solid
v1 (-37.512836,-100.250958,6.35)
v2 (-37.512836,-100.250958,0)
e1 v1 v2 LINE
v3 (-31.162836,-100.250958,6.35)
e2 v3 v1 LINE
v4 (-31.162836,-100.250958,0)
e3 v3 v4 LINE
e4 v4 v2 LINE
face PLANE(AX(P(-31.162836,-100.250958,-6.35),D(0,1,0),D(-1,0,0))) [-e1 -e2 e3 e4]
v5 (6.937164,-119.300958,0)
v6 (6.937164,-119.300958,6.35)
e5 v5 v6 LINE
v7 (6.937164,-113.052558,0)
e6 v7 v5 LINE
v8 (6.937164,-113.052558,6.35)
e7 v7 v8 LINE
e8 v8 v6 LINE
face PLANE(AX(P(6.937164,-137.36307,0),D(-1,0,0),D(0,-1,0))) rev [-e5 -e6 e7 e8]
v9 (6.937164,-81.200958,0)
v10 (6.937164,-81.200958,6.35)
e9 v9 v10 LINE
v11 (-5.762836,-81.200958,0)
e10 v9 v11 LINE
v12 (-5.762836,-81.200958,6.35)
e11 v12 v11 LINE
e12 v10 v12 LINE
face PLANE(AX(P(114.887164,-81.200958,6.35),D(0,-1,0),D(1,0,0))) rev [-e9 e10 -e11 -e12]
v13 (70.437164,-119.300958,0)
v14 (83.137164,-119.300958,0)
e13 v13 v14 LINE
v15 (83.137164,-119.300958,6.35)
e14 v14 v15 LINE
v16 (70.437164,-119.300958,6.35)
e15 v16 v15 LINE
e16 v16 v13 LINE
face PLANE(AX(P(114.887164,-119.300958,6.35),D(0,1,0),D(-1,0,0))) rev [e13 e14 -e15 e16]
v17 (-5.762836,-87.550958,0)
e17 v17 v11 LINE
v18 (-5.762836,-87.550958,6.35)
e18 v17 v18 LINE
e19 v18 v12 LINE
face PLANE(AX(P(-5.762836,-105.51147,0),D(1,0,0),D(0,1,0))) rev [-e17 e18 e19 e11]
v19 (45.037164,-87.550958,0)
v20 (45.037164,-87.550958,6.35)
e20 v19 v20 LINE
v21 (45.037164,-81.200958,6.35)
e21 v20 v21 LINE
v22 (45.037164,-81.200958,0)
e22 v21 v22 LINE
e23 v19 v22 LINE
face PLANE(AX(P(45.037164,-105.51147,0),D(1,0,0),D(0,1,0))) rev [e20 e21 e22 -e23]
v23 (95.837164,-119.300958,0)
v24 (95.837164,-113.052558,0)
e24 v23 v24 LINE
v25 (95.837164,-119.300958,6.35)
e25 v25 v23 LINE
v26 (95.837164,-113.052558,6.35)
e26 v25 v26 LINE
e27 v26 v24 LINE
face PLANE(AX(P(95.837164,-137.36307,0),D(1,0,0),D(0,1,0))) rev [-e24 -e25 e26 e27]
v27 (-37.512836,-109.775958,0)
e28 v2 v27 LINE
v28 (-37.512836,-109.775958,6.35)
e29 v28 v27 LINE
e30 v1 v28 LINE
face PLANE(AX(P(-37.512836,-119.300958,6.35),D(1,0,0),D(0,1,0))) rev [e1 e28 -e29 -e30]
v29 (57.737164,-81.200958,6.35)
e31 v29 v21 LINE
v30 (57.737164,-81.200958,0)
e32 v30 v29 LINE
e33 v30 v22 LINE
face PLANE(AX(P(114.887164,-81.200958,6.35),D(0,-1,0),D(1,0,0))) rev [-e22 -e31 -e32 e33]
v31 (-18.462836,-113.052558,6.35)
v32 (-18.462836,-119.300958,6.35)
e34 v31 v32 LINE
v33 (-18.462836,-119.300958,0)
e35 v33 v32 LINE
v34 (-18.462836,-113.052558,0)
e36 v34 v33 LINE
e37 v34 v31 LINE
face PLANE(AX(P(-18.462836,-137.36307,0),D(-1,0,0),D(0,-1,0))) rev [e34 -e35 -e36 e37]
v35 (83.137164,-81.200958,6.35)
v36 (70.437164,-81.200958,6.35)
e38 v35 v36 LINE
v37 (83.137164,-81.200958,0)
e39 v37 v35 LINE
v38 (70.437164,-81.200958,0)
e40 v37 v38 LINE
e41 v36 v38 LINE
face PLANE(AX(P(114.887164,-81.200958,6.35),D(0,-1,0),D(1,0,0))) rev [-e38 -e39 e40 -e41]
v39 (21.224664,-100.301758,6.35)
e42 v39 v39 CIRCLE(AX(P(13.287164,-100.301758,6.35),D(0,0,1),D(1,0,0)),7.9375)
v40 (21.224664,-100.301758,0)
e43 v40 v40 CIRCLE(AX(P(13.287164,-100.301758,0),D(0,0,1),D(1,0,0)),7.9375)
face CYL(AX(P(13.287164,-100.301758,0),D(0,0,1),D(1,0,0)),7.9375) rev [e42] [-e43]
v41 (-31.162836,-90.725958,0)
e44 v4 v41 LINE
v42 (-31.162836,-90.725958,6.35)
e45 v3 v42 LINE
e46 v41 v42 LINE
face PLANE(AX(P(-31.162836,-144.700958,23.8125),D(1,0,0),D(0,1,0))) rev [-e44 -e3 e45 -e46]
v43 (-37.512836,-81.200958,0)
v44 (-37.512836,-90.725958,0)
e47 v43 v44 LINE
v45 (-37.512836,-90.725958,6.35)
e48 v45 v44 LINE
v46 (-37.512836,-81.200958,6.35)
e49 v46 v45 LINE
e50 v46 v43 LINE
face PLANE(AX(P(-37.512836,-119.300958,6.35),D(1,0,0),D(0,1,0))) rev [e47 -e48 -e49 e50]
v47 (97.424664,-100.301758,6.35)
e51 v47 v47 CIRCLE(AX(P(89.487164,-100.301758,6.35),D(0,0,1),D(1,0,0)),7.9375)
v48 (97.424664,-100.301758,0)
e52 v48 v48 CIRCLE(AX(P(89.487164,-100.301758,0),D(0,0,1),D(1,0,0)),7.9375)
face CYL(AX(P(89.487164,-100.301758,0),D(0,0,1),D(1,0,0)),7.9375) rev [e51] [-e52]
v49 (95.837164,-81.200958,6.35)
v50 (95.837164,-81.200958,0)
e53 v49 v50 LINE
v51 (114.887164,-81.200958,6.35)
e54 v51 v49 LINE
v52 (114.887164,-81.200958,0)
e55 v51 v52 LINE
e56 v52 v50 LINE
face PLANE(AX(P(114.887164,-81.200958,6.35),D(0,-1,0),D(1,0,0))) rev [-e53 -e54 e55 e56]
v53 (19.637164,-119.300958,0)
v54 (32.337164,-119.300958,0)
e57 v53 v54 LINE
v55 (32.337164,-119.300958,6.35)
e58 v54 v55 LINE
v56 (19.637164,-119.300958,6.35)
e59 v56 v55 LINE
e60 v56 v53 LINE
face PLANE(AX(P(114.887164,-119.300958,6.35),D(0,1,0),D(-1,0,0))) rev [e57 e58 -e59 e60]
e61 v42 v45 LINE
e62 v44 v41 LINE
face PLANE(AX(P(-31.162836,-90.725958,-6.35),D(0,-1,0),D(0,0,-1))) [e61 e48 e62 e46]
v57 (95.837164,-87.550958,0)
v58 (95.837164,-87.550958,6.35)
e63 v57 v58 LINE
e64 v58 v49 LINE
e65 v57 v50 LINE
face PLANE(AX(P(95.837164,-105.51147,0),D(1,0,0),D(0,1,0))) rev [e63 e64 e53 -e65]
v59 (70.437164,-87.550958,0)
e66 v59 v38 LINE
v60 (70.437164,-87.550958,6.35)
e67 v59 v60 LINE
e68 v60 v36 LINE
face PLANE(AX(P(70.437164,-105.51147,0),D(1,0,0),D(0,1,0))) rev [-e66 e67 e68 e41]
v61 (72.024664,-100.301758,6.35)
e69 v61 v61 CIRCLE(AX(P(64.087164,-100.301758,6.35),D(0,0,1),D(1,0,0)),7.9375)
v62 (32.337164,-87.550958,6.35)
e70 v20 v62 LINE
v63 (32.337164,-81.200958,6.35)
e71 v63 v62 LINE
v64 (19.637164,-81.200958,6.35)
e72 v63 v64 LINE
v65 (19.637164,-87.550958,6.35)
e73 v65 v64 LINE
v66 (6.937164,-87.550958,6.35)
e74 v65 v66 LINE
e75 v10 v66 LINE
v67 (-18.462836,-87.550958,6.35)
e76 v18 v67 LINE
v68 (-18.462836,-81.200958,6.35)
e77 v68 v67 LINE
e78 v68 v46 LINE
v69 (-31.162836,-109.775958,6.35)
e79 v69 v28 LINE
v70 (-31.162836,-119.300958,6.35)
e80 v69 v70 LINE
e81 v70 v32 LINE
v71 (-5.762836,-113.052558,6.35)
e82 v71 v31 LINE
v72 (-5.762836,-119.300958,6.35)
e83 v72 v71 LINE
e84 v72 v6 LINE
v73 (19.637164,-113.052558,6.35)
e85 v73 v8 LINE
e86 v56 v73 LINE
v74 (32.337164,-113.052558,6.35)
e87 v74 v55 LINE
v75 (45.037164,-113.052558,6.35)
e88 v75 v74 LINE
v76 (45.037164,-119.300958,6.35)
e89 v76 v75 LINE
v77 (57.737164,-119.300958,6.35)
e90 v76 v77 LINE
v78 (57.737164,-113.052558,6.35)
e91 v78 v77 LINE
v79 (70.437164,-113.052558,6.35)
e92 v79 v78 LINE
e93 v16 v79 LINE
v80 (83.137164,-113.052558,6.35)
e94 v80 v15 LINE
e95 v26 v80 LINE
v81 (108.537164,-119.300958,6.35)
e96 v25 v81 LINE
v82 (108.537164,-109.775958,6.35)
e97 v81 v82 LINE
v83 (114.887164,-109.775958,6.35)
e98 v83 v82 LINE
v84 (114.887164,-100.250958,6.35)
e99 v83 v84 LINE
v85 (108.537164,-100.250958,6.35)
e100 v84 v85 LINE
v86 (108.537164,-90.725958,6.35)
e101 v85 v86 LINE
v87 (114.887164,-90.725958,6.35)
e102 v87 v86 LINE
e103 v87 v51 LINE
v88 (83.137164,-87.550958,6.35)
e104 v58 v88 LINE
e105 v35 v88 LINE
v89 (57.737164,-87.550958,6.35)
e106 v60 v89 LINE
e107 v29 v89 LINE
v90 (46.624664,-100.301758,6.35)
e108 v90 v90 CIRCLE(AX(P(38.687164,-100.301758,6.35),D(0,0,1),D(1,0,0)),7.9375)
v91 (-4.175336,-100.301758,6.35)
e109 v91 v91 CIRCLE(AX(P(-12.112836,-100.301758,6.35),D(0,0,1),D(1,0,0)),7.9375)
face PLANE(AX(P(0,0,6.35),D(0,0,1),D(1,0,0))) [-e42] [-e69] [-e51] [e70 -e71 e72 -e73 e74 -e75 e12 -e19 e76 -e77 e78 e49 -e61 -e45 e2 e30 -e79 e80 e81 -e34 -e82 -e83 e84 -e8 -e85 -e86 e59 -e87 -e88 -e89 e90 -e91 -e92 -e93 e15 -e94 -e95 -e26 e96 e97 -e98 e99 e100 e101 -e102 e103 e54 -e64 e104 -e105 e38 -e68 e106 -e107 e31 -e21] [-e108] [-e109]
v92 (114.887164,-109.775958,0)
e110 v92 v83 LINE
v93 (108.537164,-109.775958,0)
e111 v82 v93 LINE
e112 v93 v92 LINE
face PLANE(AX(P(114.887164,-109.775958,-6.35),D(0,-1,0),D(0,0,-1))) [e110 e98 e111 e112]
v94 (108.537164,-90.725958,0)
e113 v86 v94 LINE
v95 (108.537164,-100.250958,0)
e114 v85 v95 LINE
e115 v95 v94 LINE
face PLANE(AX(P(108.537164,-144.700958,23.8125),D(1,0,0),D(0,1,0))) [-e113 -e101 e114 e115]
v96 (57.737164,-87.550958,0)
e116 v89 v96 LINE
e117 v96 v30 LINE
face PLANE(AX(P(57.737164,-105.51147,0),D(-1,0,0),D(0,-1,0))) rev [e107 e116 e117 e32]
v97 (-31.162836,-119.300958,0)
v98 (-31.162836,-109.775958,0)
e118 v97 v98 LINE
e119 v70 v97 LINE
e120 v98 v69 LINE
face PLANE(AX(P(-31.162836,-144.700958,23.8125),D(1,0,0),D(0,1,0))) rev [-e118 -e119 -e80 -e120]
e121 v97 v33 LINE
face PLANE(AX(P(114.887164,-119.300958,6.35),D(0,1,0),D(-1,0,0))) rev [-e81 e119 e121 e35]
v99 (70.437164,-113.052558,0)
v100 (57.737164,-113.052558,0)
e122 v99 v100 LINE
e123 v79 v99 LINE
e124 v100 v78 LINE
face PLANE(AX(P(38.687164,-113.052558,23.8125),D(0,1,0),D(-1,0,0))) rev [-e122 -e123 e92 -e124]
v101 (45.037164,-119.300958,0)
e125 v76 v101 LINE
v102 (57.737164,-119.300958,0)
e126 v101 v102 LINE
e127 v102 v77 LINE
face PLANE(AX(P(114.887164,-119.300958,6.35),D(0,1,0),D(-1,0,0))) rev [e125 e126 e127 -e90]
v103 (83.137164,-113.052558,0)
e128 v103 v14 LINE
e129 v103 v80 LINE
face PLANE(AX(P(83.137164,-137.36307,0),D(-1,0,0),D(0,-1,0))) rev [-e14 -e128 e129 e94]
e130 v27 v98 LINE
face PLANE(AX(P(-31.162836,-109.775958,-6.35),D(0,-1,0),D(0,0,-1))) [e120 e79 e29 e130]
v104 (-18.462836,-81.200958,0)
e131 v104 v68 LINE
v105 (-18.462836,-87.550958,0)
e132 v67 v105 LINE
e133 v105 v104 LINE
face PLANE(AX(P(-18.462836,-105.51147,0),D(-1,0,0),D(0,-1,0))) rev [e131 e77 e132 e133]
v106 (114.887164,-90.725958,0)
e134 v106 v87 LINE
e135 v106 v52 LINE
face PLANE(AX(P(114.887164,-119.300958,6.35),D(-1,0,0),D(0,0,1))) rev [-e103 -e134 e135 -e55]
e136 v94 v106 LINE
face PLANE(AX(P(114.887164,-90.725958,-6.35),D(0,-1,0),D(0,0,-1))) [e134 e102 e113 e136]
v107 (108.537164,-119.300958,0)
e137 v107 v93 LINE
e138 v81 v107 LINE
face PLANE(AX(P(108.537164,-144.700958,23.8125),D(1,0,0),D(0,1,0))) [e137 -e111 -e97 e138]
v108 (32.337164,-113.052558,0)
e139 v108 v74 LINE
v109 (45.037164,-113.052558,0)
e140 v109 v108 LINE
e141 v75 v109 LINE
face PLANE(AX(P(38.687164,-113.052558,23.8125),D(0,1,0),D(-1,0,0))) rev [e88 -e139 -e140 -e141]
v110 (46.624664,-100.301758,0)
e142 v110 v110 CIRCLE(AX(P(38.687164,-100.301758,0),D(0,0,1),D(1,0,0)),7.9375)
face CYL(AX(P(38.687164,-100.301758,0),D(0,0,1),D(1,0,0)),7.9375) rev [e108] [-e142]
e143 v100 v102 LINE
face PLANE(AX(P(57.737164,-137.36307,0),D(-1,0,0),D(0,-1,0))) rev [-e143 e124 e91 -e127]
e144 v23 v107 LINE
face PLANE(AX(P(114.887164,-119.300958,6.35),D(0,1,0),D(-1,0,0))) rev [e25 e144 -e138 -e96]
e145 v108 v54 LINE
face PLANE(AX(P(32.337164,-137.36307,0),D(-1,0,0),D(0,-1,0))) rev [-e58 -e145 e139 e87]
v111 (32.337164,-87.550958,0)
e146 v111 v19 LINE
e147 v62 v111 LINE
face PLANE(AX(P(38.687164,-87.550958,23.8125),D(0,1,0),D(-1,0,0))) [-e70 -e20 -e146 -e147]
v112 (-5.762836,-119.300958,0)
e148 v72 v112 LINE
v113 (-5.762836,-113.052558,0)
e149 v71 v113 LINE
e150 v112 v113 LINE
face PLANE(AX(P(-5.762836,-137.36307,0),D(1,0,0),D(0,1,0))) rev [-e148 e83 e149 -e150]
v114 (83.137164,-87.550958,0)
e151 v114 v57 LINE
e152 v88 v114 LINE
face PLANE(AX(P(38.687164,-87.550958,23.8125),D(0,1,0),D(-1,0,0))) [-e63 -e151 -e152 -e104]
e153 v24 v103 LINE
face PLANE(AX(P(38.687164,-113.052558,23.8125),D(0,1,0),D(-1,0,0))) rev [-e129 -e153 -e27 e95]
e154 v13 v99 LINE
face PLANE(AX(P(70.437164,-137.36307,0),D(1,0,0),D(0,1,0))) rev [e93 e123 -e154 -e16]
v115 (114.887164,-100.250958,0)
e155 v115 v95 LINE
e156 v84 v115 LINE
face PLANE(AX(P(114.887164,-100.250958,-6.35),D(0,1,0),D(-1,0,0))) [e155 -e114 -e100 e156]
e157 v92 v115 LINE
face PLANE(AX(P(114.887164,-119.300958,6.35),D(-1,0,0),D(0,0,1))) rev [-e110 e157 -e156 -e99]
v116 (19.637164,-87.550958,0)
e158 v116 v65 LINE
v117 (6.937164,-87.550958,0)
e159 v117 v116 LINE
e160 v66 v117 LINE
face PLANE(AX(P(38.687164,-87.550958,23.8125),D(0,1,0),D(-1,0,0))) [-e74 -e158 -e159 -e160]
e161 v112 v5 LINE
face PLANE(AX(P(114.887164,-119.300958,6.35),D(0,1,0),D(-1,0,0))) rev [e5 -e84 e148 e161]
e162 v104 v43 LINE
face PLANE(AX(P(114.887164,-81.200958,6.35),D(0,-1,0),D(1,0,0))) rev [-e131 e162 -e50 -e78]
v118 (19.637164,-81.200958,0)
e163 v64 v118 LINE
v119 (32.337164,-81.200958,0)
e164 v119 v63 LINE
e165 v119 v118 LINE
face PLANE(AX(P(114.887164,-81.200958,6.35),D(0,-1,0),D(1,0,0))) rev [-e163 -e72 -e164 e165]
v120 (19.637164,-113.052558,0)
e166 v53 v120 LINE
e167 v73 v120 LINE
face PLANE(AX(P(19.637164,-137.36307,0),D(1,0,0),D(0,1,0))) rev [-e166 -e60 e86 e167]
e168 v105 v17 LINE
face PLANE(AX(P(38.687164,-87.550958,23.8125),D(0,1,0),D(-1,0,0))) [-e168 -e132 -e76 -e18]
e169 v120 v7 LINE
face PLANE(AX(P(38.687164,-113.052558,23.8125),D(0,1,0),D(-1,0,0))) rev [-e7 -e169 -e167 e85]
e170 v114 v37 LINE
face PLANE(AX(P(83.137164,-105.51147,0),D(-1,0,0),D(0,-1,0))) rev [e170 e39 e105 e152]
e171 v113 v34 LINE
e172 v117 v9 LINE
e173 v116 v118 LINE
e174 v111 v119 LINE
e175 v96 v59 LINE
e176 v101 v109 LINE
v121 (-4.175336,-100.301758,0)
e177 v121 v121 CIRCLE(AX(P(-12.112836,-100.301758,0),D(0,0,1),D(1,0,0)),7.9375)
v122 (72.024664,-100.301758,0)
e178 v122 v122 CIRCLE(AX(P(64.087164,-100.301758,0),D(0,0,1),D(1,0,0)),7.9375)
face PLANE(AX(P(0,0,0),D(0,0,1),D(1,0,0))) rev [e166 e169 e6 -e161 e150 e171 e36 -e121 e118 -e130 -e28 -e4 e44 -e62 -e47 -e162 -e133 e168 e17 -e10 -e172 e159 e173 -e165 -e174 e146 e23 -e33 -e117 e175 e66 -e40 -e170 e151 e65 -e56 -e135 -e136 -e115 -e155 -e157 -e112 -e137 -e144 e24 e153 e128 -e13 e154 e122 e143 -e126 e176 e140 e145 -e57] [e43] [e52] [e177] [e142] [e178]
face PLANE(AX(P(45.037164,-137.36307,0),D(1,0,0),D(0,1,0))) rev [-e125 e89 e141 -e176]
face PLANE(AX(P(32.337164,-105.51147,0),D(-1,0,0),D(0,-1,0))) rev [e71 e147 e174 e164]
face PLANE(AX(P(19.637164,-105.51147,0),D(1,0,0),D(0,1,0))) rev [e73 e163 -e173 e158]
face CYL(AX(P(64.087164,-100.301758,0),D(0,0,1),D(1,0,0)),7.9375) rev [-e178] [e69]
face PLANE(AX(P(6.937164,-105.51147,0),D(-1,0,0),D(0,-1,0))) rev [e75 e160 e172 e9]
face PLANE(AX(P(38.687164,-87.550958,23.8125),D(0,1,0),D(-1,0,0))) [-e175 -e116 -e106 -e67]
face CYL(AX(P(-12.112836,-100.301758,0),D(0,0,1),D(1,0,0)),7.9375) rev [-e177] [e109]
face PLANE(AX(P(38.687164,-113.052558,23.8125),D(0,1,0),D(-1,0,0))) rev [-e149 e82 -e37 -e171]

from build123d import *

# Parameters (mm, degrees)
SKETCH1_W             = 152.4
SKETCH1_H             = 38.1
BOSS_EXTRUDE1_DEPTH   = 6.35
CAVITY1_START         = -18.462835622
CAVITY1_OUTLINE_W     = 6.35
CAVITY1_OUTLINE_H     = 6.35
CAVITY1_OUTLINE_W_2   = 6.2484
CAVITY1_DEPTH         = 12.7
CAVITY1_START_2       = 6.937164378
CAVITY1_2_OUTLINE_W   = 6.35
CAVITY1_2_OUTLINE_H   = 6.35
CAVITY1_2_OUTLINE_W_2 = 6.2484
CAVITY1_2_DEPTH       = 12.7
CAVITY1_START_3       = 32.337164378
CAVITY1_3_OUTLINE_W   = 6.35
CAVITY1_3_OUTLINE_H   = 6.35
CAVITY1_3_OUTLINE_W_2 = 6.2484
CAVITY1_3_DEPTH       = 12.7
CAVITY1_START_4       = 57.737164378
CAVITY1_4_OUTLINE_W   = 6.35
CAVITY1_4_OUTLINE_H   = 6.35
CAVITY1_4_OUTLINE_W_2 = 6.2484
CAVITY1_4_DEPTH       = 12.7
CAVITY1_START_5       = 83.137164378
CAVITY1_5_OUTLINE_W   = 6.35
CAVITY1_5_OUTLINE_H   = 6.35
CAVITY1_5_OUTLINE_W_2 = 6.2484
CAVITY1_5_DEPTH       = 12.7
CAVITY1_START_6       = -37.512835622
CAVITY1_6_OUTLINE_W   = 9.525
CAVITY1_6_OUTLINE_H   = 6.35
CAVITY1_6_DEPTH       = 6.35
CAVITY1_START_7       = 108.537164378
CAVITY1_7_OUTLINE_W   = 9.525
CAVITY1_7_OUTLINE_H   = 6.35
CAVITY1_7_DEPTH       = 6.35
SKETCH2_R             = 7.9375
CUT_EXTRUDE1_DEPTH    = 166.74710148
LPATTERN1_COUNT       = 5
LPATTERN1_PITCH       = 25.4


# Read off the part's stored shape, not the designer's step: Cavity1
with BuildPart() as part:
    # Sketch1 → Boss-Extrude1 (new body)
    with BuildSketch(Plane.XY):
        with Locations((38.687164378, -100.250958128)):
            Rectangle(SKETCH1_W, SKETCH1_H)
    extrude(amount=BOSS_EXTRUDE1_DEPTH)

    # Cavity1 outline → Cavity1 (cut)
    with BuildSketch(Plane.YZ.offset(CAVITY1_START)):
        with Locations((-84.375958128, 3.175)):
            Rectangle(CAVITY1_OUTLINE_W, CAVITY1_OUTLINE_H)
        with Locations((-116.176758128, 3.175)):
            Rectangle(CAVITY1_OUTLINE_W_2, CAVITY1_OUTLINE_H)
    extrude(amount=CAVITY1_DEPTH, mode=Mode.SUBTRACT)

    # Cavity1 2 outline → Cavity1 2 (cut)
    with BuildSketch(Plane.YZ.offset(CAVITY1_START_2)):
        with Locations((-84.375958128, 3.175)):
            Rectangle(CAVITY1_2_OUTLINE_W, CAVITY1_2_OUTLINE_H)
        with Locations((-116.176758128, 3.175)):
            Rectangle(CAVITY1_2_OUTLINE_W_2, CAVITY1_2_OUTLINE_H)
    extrude(amount=CAVITY1_2_DEPTH, mode=Mode.SUBTRACT)

    # Cavity1 3 outline → Cavity1 3 (cut)
    with BuildSketch(Plane.YZ.offset(CAVITY1_START_3)):
        with Locations((-84.375958128, 3.175)):
            Rectangle(CAVITY1_3_OUTLINE_W, CAVITY1_3_OUTLINE_H)
        with Locations((-116.176758128, 3.175)):
            Rectangle(CAVITY1_3_OUTLINE_W_2, CAVITY1_3_OUTLINE_H)
    extrude(amount=CAVITY1_3_DEPTH, mode=Mode.SUBTRACT)

    # Cavity1 4 outline → Cavity1 4 (cut)
    with BuildSketch(Plane.YZ.offset(CAVITY1_START_4)):
        with Locations((-84.375958128, 3.175)):
            Rectangle(CAVITY1_4_OUTLINE_W, CAVITY1_4_OUTLINE_H)
        with Locations((-116.176758128, 3.175)):
            Rectangle(CAVITY1_4_OUTLINE_W_2, CAVITY1_4_OUTLINE_H)
    extrude(amount=CAVITY1_4_DEPTH, mode=Mode.SUBTRACT)

    # Cavity1 5 outline → Cavity1 5 (cut)
    with BuildSketch(Plane.YZ.offset(CAVITY1_START_5)):
        with Locations((-84.375958128, 3.175)):
            Rectangle(CAVITY1_5_OUTLINE_W, CAVITY1_5_OUTLINE_H)
        with Locations((-116.176758128, 3.175)):
            Rectangle(CAVITY1_5_OUTLINE_W_2, CAVITY1_5_OUTLINE_H)
    extrude(amount=CAVITY1_5_DEPTH, mode=Mode.SUBTRACT)

    # Cavity1 6 outline → Cavity1 6 (cut)
    with BuildSketch(Plane.YZ.offset(CAVITY1_START_6)):
        with Locations((-95.488458128, 3.175)):
            Rectangle(CAVITY1_6_OUTLINE_W, CAVITY1_6_OUTLINE_H)
        with Locations((-114.538458128, 3.175)):
            Rectangle(CAVITY1_6_OUTLINE_W, CAVITY1_6_OUTLINE_H)
    extrude(amount=CAVITY1_6_DEPTH, mode=Mode.SUBTRACT)

    # Cavity1 7 outline → Cavity1 7 (cut)
    with BuildSketch(Plane.YZ.offset(CAVITY1_START_7)):
        with Locations((-95.488458128, 3.175)):
            Rectangle(CAVITY1_7_OUTLINE_W, CAVITY1_7_OUTLINE_H)
        with Locations((-114.538458128, 3.175)):
            Rectangle(CAVITY1_7_OUTLINE_W, CAVITY1_7_OUTLINE_H)
    extrude(amount=CAVITY1_7_DEPTH, mode=Mode.SUBTRACT)

    # Sketch2 → Cut-Extrude1 (cut, through all)
    with BuildSketch(Plane.XY.offset(6.35)):
        with Locations((-12.112835622, -100.301758128)):
            Circle(SKETCH2_R)
    cut_extrude1 = extrude(amount=-CUT_EXTRUDE1_DEPTH, mode=Mode.SUBTRACT)

    # LPattern1: Cut-Extrude1 ×5
    with Locations(*[(i * LPATTERN1_PITCH, 0, 0) for i in range(1, LPATTERN1_COUNT)]):
        add(cut_extrude1, mode=Mode.SUBTRACT)


solid = part.part
